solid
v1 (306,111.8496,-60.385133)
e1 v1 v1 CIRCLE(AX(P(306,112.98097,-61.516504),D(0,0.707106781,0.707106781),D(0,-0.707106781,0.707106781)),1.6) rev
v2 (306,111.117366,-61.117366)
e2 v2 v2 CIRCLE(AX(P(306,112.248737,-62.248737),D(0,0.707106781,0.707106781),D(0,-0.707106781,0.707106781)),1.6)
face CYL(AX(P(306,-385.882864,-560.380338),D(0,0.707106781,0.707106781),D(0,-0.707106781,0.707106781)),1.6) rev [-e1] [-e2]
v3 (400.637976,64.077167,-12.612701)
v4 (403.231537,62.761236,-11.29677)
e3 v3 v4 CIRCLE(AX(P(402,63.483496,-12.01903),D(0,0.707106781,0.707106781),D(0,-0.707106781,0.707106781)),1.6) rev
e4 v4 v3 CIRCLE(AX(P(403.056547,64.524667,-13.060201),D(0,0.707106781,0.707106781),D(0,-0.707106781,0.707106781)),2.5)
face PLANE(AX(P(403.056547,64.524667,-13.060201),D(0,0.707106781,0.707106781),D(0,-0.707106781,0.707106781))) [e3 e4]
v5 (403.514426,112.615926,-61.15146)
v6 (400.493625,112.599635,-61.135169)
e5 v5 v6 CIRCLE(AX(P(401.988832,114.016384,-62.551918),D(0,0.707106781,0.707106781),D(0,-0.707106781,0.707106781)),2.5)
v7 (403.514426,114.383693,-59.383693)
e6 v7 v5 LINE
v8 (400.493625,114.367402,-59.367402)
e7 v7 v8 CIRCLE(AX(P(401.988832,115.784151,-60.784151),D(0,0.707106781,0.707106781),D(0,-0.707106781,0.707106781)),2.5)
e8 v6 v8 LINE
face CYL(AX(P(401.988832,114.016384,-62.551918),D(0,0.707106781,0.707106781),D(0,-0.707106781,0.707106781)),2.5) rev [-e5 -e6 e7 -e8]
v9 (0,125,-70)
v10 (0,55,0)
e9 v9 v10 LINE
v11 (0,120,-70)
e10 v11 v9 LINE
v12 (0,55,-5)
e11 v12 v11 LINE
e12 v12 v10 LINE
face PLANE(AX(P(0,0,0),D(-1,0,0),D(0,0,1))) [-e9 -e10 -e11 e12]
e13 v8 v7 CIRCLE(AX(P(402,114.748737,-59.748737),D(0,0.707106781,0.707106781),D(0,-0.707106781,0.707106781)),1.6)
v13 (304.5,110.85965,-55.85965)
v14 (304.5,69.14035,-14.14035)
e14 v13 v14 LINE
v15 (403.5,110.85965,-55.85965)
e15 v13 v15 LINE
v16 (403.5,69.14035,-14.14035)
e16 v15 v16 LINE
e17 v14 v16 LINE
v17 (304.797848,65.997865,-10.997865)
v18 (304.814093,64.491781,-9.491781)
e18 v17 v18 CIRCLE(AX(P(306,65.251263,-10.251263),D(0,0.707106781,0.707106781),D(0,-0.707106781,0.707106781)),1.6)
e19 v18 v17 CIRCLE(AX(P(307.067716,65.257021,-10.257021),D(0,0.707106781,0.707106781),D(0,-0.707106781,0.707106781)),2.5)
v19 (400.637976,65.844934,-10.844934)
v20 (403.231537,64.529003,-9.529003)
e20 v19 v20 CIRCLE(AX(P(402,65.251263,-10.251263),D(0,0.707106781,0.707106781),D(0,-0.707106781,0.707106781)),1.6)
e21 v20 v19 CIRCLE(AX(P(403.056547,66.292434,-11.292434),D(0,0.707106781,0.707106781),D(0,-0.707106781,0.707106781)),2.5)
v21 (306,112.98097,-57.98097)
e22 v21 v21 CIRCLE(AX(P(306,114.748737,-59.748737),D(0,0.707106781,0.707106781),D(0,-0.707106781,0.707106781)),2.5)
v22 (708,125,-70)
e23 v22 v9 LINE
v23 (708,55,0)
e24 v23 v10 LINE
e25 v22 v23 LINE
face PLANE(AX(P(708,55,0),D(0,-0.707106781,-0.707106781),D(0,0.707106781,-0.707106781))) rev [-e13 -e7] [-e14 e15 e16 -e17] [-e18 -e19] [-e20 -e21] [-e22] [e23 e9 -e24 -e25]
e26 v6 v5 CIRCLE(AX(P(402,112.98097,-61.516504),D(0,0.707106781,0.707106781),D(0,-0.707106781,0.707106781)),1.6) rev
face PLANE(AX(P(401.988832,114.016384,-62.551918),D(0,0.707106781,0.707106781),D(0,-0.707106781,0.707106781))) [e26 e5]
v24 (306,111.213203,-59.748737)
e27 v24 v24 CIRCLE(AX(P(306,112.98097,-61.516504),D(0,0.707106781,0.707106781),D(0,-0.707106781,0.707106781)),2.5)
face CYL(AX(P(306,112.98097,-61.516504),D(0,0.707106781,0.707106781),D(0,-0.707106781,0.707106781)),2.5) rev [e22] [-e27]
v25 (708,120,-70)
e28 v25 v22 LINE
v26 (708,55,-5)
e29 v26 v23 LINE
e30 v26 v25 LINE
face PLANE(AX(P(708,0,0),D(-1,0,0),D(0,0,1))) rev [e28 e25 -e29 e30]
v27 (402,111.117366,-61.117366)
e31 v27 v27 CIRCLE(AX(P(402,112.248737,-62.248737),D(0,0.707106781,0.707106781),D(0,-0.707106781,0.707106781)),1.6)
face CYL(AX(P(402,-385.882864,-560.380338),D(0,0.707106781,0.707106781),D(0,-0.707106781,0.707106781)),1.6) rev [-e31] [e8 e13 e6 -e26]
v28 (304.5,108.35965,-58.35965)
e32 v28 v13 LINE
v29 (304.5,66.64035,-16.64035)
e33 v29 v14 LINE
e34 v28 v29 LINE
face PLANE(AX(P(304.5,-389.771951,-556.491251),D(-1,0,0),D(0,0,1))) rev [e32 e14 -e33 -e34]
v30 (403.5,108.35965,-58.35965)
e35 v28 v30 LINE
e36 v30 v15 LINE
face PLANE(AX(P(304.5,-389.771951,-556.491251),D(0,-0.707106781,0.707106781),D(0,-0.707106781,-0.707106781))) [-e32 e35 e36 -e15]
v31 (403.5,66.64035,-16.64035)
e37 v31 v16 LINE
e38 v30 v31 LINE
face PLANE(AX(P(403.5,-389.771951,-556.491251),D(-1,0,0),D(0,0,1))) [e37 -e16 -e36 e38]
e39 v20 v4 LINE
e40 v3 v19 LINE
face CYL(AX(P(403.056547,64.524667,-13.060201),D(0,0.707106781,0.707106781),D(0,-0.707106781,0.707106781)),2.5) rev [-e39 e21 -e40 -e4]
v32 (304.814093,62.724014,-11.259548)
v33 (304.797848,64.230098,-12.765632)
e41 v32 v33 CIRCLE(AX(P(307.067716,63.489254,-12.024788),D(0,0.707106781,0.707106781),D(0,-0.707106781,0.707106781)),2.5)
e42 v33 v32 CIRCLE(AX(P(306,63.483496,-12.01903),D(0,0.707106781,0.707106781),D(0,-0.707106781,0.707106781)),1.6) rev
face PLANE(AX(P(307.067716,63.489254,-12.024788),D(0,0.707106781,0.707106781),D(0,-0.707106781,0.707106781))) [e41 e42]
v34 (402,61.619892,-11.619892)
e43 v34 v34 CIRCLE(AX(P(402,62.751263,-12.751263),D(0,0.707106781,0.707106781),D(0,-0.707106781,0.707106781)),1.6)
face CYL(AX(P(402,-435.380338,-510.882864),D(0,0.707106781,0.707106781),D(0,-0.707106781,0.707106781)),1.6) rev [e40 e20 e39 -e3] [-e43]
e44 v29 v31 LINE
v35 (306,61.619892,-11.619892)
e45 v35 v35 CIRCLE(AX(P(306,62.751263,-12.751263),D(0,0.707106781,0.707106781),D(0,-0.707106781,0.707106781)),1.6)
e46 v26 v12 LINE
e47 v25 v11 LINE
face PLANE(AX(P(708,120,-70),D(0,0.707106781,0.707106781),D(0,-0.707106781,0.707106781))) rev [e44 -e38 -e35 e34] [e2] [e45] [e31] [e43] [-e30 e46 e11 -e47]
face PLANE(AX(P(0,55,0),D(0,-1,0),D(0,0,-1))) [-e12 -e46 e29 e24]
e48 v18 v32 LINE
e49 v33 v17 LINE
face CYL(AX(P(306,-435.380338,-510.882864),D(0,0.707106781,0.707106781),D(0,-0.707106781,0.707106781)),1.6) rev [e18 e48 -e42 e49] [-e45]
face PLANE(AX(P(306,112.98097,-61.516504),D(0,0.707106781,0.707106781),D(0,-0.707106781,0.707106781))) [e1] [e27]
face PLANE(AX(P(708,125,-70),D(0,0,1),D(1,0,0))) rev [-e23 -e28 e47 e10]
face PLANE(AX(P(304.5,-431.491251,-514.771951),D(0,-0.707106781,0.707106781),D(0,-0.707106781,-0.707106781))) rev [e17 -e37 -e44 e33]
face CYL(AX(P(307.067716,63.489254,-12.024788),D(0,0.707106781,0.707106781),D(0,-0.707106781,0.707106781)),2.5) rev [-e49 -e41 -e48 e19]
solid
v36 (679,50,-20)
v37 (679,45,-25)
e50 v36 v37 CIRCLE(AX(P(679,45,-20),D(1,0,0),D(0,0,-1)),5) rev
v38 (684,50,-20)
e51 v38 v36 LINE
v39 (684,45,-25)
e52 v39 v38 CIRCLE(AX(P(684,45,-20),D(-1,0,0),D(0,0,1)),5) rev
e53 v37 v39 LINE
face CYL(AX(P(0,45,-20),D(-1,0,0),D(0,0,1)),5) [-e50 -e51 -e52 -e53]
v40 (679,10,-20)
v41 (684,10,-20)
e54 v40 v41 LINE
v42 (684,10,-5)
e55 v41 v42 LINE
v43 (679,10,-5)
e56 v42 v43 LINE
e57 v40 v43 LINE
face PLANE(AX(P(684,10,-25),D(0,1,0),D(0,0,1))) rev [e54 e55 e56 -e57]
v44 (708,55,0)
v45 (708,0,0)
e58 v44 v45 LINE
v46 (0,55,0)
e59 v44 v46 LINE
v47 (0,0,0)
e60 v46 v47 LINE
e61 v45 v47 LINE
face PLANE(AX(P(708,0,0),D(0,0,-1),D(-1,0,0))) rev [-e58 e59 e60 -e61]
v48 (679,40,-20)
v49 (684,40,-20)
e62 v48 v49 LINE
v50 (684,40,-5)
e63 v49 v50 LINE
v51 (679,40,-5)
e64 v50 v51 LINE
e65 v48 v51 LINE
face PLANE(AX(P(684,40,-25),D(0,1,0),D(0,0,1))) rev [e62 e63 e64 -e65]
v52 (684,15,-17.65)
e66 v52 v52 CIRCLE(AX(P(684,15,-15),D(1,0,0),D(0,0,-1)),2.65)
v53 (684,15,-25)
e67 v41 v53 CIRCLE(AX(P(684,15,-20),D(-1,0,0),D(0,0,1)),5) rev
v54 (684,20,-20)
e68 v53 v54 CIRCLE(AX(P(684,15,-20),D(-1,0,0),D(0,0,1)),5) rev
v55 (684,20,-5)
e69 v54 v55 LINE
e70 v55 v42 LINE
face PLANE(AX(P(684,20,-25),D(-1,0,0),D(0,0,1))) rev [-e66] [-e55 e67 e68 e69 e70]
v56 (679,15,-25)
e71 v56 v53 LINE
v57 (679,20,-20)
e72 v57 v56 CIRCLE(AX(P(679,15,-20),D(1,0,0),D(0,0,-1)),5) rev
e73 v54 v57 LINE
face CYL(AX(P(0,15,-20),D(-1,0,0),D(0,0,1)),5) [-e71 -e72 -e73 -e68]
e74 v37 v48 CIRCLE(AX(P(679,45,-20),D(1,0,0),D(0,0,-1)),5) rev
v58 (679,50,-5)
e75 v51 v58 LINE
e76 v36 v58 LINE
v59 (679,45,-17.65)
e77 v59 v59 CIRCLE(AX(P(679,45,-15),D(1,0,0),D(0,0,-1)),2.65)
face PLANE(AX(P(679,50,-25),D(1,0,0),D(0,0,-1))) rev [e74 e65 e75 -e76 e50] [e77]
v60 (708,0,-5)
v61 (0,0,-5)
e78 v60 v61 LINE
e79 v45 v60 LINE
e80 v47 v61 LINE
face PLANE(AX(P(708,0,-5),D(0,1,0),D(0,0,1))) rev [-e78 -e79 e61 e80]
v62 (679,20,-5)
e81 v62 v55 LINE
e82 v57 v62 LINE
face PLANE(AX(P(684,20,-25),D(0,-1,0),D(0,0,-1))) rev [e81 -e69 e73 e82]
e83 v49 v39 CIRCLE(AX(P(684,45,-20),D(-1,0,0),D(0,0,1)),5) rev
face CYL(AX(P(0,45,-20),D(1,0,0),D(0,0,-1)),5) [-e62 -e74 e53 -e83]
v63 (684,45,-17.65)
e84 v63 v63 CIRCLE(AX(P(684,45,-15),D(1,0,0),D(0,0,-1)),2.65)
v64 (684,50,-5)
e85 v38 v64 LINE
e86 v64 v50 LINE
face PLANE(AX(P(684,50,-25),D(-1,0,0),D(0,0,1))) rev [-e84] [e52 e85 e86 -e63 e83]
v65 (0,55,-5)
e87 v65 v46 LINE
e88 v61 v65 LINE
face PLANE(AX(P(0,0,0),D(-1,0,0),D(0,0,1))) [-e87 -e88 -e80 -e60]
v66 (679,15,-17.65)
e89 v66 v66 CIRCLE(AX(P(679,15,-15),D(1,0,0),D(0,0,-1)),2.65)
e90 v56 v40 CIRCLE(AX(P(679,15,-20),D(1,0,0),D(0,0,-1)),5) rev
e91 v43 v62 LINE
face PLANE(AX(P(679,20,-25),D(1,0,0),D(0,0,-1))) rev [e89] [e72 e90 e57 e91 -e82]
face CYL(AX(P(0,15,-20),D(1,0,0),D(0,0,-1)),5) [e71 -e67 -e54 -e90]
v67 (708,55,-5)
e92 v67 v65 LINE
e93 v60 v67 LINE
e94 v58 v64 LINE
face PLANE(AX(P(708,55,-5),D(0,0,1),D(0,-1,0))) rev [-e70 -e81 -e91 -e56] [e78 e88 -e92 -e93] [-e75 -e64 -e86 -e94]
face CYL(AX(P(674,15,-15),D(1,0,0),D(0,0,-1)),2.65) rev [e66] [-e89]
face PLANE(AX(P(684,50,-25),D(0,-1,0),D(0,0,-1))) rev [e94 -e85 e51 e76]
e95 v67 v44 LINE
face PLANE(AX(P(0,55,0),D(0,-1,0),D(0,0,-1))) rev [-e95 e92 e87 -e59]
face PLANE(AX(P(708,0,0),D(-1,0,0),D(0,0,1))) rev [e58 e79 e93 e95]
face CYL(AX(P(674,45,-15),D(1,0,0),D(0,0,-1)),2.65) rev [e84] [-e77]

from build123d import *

# Parameters (mm, degrees)
BOSS_EXTRUDE1_DEPTH = 708
SKETCH2_R           = 1.6
SKETCH2_W           = 99
SKETCH2_H           = 59
CUT_EXTRUDE1_DEPTH  = 708
SKETCH3_W           = 5
SKETCH3_H           = 10
BOSS_EXTRUDE2_DEPTH = 20
FILLET1_R           = 5
SKETCH4_R           = 2.65
CUT_EXTRUDE2_DEPTH  = 10
SKETCH6_R           = 2.5
CUT_EXTRUDE3_DEPTH  = 2.5


with BuildPart() as part:
    # Sketch1 → Boss-Extrude1 (new body)
    with BuildSketch(Plane(origin=(0, 0, 0), x_dir=(0, 0, -1), z_dir=(1, 0, 0))):
        Polygon((0, 0), (0, 55), (70, 125), (70, 120), (5, 55), (5, 0), align=None)
    extrude(amount=BOSS_EXTRUDE1_DEPTH)

    # Sketch2 → Cut-Extrude1 (cut)
    with BuildSketch(Plane(origin=(0, 27.5, 27.5), x_dir=(1, 0, 0), z_dir=(0, 0.7071067811865477, 0.7071067811865475))):
        with Locations(Location((306, 123.388347648, 0), (0, 0, 270))):
            Circle(SKETCH2_R)
        with Locations(Location((402, 123.388347648, 0), (0, 0, 270))):
            Circle(SKETCH2_R)
        with Locations(Location((402, 53.388347648, 0), (0, 0, 270))):
            Circle(SKETCH2_R)
        with Locations(Location((306, 53.388347648, 0), (0, 0, 270))):
            Circle(SKETCH2_R)
        with Locations((354, 88.388347648)):
            Rectangle(SKETCH2_W, SKETCH2_H)
    extrude(amount=-CUT_EXTRUDE1_DEPTH, mode=Mode.SUBTRACT)

    # Sketch3 → Boss-Extrude2 (add)
    with BuildSketch(Plane(origin=(0, 0, -5), x_dir=(-1, 0, 0), z_dir=(0, 0, -1))):
        with Locations((-681.5, 45)):
            Rectangle(SKETCH3_W, SKETCH3_H)
        with Locations((-681.5, 15)):
            Rectangle(SKETCH3_W, SKETCH3_H)
    extrude(amount=BOSS_EXTRUDE2_DEPTH)

    # Fillet1
    fillet1_edges = [part.edges().sort_by_distance(p)[0] for p in [
        (681.5, 10, -25),
        (681.5, 20, -25),
        (681.5, 40, -25),
        (681.5, 50, -25),
    ]]
    fillet(fillet1_edges, radius=FILLET1_R - 0.0001)  # a hair under: the kernel refuses the full size

    # Sketch4 → Cut-Extrude2 (cut)
    with BuildSketch(Plane(origin=(684, 0, 0), x_dir=(0, 0, -1), z_dir=(1, 0, 0))):
        with Locations((15, 45)):
            Circle(SKETCH4_R)
        with Locations((15, 15)):
            Circle(SKETCH4_R)
    extrude(amount=-CUT_EXTRUDE2_DEPTH, mode=Mode.SUBTRACT)

    # Sketch6 → Cut-Extrude3 (cut)
    with BuildSketch(Plane(origin=(0, 27.5, 27.5), x_dir=(1, 0, 0), z_dir=(0, 0.7071067811865477, 0.7071067811865475))):
        with Locations(Location((306, 123.388347648, 0), (0, 0, 270))):
            Circle(SKETCH6_R)
        with Locations((401.98883184, 124.852643374)):
            Circle(SKETCH6_R)
        with Locations((403.056547473, 54.860786824)):
            Circle(SKETCH6_R)
        with Locations((307.067715633, 53.396491098)):
            Circle(SKETCH6_R)
    extrude(amount=-CUT_EXTRUDE3_DEPTH, mode=Mode.SUBTRACT)


with BuildPart() as body_2:
    # Split1: the piece on the far side of the plane
    add(part.part)
    split(bisect_by=Plane(origin=(0, 55, 0), x_dir=(0, 0, -1), z_dir=(0, -1, 0)), keep=Keep.BOTTOM)


with BuildPart() as part_1:
    add(part.part)

    # Split1
    split(bisect_by=Plane(origin=(0, 55, 0), x_dir=(0, 0, -1), z_dir=(0, -1, 0)), keep=Keep.TOP)


solid = Compound([body_2.part, part_1.part])
